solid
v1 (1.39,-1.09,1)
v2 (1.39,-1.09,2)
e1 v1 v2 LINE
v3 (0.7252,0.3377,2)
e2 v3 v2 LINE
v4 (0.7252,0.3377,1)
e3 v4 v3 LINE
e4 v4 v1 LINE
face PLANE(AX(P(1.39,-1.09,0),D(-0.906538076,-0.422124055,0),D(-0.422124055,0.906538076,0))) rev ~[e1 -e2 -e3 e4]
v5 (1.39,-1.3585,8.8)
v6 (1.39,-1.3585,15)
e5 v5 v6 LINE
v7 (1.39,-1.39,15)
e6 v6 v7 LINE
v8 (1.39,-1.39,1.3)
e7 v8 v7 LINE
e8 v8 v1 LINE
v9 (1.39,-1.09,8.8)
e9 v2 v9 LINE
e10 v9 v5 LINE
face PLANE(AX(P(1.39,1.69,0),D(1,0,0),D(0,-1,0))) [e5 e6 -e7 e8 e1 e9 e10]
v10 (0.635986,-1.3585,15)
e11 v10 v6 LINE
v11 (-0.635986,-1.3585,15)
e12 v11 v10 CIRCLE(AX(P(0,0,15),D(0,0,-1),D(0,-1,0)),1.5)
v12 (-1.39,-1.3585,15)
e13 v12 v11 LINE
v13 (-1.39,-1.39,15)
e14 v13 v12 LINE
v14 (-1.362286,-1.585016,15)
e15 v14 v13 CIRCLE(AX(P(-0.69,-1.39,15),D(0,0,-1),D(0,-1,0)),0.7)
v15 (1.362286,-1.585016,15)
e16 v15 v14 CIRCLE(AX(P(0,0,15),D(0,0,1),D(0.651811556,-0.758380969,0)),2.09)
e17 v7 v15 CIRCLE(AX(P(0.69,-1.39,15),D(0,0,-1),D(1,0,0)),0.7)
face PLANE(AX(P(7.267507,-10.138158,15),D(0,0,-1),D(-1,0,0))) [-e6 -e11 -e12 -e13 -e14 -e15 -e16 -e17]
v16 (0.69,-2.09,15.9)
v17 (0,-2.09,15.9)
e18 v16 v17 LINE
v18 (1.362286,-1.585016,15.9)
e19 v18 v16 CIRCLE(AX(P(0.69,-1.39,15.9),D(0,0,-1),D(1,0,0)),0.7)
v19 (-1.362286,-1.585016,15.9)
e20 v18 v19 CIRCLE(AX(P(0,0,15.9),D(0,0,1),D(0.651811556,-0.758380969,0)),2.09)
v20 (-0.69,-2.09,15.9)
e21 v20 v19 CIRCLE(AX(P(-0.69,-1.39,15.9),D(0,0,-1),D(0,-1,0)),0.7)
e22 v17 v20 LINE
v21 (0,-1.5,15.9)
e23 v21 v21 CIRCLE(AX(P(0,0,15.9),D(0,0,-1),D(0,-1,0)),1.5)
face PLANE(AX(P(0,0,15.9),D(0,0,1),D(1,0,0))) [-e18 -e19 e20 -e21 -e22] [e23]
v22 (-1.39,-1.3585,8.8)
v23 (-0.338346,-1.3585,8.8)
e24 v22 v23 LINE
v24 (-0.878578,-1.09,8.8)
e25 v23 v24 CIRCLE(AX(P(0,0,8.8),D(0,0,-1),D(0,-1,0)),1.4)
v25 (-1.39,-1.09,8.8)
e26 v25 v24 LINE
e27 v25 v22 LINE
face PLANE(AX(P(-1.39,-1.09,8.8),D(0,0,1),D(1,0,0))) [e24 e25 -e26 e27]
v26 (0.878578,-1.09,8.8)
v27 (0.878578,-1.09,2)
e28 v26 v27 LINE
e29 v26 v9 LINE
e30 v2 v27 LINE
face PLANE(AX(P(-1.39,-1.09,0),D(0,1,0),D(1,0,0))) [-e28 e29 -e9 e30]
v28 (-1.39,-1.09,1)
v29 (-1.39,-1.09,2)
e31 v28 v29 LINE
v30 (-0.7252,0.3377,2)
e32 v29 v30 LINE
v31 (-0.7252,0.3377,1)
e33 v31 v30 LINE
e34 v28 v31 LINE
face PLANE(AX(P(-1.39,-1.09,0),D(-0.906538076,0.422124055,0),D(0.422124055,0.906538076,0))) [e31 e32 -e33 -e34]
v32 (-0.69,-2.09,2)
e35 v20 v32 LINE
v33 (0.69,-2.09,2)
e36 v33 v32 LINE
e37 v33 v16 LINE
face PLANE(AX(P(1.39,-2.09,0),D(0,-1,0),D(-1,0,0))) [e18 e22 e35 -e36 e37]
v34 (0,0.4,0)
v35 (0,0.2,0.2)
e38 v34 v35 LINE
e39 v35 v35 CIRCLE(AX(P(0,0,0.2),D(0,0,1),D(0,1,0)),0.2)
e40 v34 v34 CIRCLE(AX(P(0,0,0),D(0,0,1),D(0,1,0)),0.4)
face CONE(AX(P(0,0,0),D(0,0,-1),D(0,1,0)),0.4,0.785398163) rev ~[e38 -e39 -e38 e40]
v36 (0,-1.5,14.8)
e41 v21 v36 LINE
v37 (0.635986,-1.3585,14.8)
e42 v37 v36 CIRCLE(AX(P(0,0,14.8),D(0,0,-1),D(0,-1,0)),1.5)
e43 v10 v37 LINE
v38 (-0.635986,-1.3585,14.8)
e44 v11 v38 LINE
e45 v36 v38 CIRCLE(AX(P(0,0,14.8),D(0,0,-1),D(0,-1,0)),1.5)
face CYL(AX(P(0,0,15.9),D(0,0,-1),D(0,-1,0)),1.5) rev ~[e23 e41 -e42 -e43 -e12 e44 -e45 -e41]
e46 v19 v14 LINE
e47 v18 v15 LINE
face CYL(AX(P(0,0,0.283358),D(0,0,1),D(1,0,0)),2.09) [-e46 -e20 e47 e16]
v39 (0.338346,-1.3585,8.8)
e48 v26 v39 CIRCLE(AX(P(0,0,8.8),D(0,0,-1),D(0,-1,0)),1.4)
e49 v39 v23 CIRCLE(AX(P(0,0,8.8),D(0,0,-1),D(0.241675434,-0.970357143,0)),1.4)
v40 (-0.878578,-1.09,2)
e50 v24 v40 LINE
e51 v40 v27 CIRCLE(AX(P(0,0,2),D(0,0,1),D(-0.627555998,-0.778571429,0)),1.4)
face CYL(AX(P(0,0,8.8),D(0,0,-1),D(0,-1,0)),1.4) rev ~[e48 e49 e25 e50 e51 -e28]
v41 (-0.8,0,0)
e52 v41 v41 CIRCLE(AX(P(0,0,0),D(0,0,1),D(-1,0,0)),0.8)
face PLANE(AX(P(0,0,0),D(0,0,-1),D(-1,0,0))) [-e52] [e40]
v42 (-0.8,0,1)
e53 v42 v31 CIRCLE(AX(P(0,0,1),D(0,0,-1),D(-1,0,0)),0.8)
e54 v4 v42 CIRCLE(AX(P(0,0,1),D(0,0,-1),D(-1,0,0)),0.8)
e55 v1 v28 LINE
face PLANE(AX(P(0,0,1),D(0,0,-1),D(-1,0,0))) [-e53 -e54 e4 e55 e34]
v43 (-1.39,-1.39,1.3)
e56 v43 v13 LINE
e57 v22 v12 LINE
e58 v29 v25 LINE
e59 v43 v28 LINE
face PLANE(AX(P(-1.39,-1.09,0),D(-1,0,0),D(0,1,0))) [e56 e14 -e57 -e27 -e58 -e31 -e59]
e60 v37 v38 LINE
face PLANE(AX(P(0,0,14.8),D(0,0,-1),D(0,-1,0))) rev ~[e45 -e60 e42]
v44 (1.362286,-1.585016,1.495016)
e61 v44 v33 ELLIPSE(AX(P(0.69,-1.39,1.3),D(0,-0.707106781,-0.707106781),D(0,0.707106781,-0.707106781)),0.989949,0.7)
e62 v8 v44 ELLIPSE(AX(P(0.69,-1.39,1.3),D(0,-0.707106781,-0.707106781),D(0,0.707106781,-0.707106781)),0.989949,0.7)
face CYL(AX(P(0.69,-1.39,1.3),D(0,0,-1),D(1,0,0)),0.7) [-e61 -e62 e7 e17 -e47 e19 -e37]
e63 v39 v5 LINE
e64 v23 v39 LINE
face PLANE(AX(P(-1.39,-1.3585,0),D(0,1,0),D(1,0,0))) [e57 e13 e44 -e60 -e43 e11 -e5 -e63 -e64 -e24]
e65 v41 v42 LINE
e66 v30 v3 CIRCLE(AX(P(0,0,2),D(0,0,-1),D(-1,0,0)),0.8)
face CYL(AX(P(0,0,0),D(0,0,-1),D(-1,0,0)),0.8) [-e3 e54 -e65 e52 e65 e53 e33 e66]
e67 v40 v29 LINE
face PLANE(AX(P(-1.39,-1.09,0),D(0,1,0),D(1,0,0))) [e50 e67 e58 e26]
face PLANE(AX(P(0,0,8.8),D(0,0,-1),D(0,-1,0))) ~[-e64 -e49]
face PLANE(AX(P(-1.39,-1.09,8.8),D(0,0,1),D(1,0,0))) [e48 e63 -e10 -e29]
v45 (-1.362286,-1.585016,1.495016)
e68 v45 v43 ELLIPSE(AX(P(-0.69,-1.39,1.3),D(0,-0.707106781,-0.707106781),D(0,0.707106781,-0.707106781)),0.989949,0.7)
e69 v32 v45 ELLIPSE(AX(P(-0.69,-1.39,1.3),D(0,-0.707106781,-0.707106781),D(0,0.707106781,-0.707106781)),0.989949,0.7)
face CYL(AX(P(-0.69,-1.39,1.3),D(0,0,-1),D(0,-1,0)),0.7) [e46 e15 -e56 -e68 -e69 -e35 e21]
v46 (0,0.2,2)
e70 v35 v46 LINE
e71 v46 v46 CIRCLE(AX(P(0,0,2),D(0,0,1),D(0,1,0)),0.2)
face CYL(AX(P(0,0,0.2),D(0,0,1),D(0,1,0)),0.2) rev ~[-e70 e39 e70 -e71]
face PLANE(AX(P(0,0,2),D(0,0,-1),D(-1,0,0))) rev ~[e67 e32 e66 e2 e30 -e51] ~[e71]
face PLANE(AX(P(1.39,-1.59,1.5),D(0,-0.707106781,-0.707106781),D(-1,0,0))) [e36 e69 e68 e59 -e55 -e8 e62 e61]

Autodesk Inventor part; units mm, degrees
ref_plane "YZ Plane" through (0, 0, 0) normal (1, 0, 0) x (0, 1, 0)
ref_plane "XZ Plane" through (0, 0, 0) normal (0, 1, 0) x (-1, 0, 0)
ref_plane "XY Plane" through (0, 0, 0) normal (0, 0, 1) x (1, 0, 0)
sketch "Sketch1" plane through (0, 0, 0) normal (0, 0, 1) x (1, 0, 0)
  line L0 (-1.39, -1.09) -> (1.39, -1.09)
  line L1 (1.39, -1.09) -> (1.39, -2.09)
  line L2 (1.39, -2.09) -> (-1.39, -2.09)
  line L3 (-1.39, -2.09) -> (-1.39, -1.09)
  point P0 (0, 0)
  dimension "d0" = 1
  dimension "d1" = 1.39
  dimension "d2" = 2.78
  dimension "d3" = 1.09
extrude "Extrusion1" add sketch "Sketch1" along normal blind 15.9
sketch "Sketch2" plane through (-1.39, -1.09, 0) normal (0, 1, 0) x (1, 0, 0)
  line L0 (0, 0) -> (0, -15.9) projected
  line L1 (0, -8.8) -> (2.78, -8.8)
  line L2 (2.78, -8.8) -> (2.78, -15.9)
  line L3 (2.78, -15.9) -> (0, -15.9)
  line L4 (0, -15.9) -> (0, -8.8)
  point P0 (1.39, 0)
  dimension "d6" = 7.1
extrude "Extrusion2" cut sketch "Sketch2" against normal blind 0.2685
sketch "Sketch3" plane through (0, 0, 0) normal (0, 0, -1) x (-1, 0, 0)
  line L0 (-1.39, -1.09) -> (1.39, -1.09)
  line L1 (1.39, -1.09) -> (1.39, 1.69)
  line L2 (1.39, 1.69) -> (-1.39, 1.69)
  line L3 (-1.39, 1.69) -> (-1.39, -1.09)
  point P0 (0, 0)
  dimension "d9" = 2.78
extrude "Extrusion3" add sketch "Sketch3" against normal blind 2
sketch "Sketch4" plane through (0, 0, 0) normal (0, 0, -1) x (-1, 0, 0)
  line L0 (-1.39, 1.69) -> (-1.39, -2.09) projected
  line L1 (1.39, -2.09) -> (1.39, 1.69) projected
  line L2 (1.39, 1.69) -> (-1.39, 1.69) projected
  circle A0 centre (0, 0) radius 0.8
  line L3 (-1.39, -1.3585) -> (1.39, -1.3585) projected
  line L4 (-1.39, -1.09) -> (1.39, -1.09) projected
  line L5 (-1.39, -1.09) -> (-0.7252, 0.3377)
  line L6 (1.39, -1.09) -> (0.7252, 0.3377)
  dimension "d12" = 1.6
extrude "Extrusion4" cut sketch "Sketch4" against normal through all contours L2 L1 L6 A0 L5 L0
sketch "Sketch5" plane through (0, 0, 0) normal (0, 0, -1) x (-1, 0, 0)
  line L0 (-0.7252, 0.3377) -> (-1.39, -1.09) projected
  line L1 (-1.39, -1.09) -> (-1.39, -2.09) projected
  line L2 (-1.39, -2.09) -> (1.39, -2.09) projected
  line L3 (1.39, -2.09) -> (1.39, -1.09) projected
  line L4 (1.39, -1.09) -> (0.7252, 0.3377) projected
  arc A0 (0.7252, 0.3377) -> (-0.7252, 0.3377) centre (0, 0) ccw projected
  circle A1 centre (0, 0) radius 0.8
extrude "Extrusion5" cut sketch "Sketch5" against normal blind 1 contours A1 L4 L3 L2 L1 L0
hole "Hole1" at (0, 0, 0) direction (0, 0, 1) diameter 0.4 end through all countersink diameter 0.8 countersink angle 90
sketch "Sketch6" plane through (-1.39, -2.09, 15.9) normal (0, -1, 0) x (1, 0, 0)
  line L0 (2.78, -15.9) -> (2.78, 0) projected
  line L1 (2.78, 0) -> (0, 0) projected
  circle A0 centre (1.39, -1.5) radius 0.5
  point P0 (2.78, -14.9)
  point P1 (1.39, -15.9)
  point P2 (1.39, -1)
  point P3 (1.39, -2)
  dimension "d26" = 1
  dimension "d27" = 1.39
  dimension "d28" = 1.5
extrude "Extrusion6" [suppressed]
chamfer "Chamfer1" distance 1 angle 45 1 edges at (0, -2.09, 1)
ref_plane "Work Plane1" through (0, -2.09, 14.9) normal (0, 0, 1) x (1, 0, 0)
ref_plane "Work Plane2" through (0, -2.09, 13.9) normal (0, 0, 1) x (1, 0, 0)
sketch "Sketch10" plane through (0, 0, 15.9) normal (0, 0, 1) x (1, 0, 0)
  line L0 (1.39, -1.3585) -> (-1.39, -1.3585) projected
  circle A0 centre (0, 0) radius 2.09
  line L1 (1.39, -2.09) -> (-1.39, -2.09) projected
  dimension "d54" = 4.18
extrude "Extrusion7" add sketch "Sketch10" against normal blind 0.9
sketch "Sketch11" plane through (0, 0, 15.9) normal (0, 0, 1) x (1, 0, 0)
  arc A0 (1.39, -1.5608) -> (-1.39, -1.5608) centre (0, 0) ccw projected
  circle A1 centre (0, 0) radius 1.3
  point P0 (1.6431, -0.954)
  point P1 (-1.6431, -0.954)
  dimension "d41" = 2.6
hole "Hole2" at (0, 0, 15.9) direction (0, 0, -1) diameter 3 depth 1.1
fillet "Fillet3" radius 0.7 2 edges at (1.39, -2.09, 8.95) (-1.39, -2.09, 8.95)
sketch "Sketch13" plane through (-1.39, -1.09, 8.8) normal (0, 0, 1) x (1, 0, 0)
  point P0 (1.39, 1.09)
  point P1 (1.39, 1.09)
hole "Hole4" at (0, 0, 8.8) at (0, 0, 8.8) direction (0, 0, -1) diameter 2.8 depth 6.8
sketch "Sketch15" plane through (0, -2.09, 14.9) normal (0, 0, 1) x (1, 0, 0)
  point P0 (0, 2.09)
  point P1 (0, 2.09)
hole "Hole5" [suppressed]
properties part number "MU_Motor_Asm_Frame_new3" material "Aluminum-6061"
